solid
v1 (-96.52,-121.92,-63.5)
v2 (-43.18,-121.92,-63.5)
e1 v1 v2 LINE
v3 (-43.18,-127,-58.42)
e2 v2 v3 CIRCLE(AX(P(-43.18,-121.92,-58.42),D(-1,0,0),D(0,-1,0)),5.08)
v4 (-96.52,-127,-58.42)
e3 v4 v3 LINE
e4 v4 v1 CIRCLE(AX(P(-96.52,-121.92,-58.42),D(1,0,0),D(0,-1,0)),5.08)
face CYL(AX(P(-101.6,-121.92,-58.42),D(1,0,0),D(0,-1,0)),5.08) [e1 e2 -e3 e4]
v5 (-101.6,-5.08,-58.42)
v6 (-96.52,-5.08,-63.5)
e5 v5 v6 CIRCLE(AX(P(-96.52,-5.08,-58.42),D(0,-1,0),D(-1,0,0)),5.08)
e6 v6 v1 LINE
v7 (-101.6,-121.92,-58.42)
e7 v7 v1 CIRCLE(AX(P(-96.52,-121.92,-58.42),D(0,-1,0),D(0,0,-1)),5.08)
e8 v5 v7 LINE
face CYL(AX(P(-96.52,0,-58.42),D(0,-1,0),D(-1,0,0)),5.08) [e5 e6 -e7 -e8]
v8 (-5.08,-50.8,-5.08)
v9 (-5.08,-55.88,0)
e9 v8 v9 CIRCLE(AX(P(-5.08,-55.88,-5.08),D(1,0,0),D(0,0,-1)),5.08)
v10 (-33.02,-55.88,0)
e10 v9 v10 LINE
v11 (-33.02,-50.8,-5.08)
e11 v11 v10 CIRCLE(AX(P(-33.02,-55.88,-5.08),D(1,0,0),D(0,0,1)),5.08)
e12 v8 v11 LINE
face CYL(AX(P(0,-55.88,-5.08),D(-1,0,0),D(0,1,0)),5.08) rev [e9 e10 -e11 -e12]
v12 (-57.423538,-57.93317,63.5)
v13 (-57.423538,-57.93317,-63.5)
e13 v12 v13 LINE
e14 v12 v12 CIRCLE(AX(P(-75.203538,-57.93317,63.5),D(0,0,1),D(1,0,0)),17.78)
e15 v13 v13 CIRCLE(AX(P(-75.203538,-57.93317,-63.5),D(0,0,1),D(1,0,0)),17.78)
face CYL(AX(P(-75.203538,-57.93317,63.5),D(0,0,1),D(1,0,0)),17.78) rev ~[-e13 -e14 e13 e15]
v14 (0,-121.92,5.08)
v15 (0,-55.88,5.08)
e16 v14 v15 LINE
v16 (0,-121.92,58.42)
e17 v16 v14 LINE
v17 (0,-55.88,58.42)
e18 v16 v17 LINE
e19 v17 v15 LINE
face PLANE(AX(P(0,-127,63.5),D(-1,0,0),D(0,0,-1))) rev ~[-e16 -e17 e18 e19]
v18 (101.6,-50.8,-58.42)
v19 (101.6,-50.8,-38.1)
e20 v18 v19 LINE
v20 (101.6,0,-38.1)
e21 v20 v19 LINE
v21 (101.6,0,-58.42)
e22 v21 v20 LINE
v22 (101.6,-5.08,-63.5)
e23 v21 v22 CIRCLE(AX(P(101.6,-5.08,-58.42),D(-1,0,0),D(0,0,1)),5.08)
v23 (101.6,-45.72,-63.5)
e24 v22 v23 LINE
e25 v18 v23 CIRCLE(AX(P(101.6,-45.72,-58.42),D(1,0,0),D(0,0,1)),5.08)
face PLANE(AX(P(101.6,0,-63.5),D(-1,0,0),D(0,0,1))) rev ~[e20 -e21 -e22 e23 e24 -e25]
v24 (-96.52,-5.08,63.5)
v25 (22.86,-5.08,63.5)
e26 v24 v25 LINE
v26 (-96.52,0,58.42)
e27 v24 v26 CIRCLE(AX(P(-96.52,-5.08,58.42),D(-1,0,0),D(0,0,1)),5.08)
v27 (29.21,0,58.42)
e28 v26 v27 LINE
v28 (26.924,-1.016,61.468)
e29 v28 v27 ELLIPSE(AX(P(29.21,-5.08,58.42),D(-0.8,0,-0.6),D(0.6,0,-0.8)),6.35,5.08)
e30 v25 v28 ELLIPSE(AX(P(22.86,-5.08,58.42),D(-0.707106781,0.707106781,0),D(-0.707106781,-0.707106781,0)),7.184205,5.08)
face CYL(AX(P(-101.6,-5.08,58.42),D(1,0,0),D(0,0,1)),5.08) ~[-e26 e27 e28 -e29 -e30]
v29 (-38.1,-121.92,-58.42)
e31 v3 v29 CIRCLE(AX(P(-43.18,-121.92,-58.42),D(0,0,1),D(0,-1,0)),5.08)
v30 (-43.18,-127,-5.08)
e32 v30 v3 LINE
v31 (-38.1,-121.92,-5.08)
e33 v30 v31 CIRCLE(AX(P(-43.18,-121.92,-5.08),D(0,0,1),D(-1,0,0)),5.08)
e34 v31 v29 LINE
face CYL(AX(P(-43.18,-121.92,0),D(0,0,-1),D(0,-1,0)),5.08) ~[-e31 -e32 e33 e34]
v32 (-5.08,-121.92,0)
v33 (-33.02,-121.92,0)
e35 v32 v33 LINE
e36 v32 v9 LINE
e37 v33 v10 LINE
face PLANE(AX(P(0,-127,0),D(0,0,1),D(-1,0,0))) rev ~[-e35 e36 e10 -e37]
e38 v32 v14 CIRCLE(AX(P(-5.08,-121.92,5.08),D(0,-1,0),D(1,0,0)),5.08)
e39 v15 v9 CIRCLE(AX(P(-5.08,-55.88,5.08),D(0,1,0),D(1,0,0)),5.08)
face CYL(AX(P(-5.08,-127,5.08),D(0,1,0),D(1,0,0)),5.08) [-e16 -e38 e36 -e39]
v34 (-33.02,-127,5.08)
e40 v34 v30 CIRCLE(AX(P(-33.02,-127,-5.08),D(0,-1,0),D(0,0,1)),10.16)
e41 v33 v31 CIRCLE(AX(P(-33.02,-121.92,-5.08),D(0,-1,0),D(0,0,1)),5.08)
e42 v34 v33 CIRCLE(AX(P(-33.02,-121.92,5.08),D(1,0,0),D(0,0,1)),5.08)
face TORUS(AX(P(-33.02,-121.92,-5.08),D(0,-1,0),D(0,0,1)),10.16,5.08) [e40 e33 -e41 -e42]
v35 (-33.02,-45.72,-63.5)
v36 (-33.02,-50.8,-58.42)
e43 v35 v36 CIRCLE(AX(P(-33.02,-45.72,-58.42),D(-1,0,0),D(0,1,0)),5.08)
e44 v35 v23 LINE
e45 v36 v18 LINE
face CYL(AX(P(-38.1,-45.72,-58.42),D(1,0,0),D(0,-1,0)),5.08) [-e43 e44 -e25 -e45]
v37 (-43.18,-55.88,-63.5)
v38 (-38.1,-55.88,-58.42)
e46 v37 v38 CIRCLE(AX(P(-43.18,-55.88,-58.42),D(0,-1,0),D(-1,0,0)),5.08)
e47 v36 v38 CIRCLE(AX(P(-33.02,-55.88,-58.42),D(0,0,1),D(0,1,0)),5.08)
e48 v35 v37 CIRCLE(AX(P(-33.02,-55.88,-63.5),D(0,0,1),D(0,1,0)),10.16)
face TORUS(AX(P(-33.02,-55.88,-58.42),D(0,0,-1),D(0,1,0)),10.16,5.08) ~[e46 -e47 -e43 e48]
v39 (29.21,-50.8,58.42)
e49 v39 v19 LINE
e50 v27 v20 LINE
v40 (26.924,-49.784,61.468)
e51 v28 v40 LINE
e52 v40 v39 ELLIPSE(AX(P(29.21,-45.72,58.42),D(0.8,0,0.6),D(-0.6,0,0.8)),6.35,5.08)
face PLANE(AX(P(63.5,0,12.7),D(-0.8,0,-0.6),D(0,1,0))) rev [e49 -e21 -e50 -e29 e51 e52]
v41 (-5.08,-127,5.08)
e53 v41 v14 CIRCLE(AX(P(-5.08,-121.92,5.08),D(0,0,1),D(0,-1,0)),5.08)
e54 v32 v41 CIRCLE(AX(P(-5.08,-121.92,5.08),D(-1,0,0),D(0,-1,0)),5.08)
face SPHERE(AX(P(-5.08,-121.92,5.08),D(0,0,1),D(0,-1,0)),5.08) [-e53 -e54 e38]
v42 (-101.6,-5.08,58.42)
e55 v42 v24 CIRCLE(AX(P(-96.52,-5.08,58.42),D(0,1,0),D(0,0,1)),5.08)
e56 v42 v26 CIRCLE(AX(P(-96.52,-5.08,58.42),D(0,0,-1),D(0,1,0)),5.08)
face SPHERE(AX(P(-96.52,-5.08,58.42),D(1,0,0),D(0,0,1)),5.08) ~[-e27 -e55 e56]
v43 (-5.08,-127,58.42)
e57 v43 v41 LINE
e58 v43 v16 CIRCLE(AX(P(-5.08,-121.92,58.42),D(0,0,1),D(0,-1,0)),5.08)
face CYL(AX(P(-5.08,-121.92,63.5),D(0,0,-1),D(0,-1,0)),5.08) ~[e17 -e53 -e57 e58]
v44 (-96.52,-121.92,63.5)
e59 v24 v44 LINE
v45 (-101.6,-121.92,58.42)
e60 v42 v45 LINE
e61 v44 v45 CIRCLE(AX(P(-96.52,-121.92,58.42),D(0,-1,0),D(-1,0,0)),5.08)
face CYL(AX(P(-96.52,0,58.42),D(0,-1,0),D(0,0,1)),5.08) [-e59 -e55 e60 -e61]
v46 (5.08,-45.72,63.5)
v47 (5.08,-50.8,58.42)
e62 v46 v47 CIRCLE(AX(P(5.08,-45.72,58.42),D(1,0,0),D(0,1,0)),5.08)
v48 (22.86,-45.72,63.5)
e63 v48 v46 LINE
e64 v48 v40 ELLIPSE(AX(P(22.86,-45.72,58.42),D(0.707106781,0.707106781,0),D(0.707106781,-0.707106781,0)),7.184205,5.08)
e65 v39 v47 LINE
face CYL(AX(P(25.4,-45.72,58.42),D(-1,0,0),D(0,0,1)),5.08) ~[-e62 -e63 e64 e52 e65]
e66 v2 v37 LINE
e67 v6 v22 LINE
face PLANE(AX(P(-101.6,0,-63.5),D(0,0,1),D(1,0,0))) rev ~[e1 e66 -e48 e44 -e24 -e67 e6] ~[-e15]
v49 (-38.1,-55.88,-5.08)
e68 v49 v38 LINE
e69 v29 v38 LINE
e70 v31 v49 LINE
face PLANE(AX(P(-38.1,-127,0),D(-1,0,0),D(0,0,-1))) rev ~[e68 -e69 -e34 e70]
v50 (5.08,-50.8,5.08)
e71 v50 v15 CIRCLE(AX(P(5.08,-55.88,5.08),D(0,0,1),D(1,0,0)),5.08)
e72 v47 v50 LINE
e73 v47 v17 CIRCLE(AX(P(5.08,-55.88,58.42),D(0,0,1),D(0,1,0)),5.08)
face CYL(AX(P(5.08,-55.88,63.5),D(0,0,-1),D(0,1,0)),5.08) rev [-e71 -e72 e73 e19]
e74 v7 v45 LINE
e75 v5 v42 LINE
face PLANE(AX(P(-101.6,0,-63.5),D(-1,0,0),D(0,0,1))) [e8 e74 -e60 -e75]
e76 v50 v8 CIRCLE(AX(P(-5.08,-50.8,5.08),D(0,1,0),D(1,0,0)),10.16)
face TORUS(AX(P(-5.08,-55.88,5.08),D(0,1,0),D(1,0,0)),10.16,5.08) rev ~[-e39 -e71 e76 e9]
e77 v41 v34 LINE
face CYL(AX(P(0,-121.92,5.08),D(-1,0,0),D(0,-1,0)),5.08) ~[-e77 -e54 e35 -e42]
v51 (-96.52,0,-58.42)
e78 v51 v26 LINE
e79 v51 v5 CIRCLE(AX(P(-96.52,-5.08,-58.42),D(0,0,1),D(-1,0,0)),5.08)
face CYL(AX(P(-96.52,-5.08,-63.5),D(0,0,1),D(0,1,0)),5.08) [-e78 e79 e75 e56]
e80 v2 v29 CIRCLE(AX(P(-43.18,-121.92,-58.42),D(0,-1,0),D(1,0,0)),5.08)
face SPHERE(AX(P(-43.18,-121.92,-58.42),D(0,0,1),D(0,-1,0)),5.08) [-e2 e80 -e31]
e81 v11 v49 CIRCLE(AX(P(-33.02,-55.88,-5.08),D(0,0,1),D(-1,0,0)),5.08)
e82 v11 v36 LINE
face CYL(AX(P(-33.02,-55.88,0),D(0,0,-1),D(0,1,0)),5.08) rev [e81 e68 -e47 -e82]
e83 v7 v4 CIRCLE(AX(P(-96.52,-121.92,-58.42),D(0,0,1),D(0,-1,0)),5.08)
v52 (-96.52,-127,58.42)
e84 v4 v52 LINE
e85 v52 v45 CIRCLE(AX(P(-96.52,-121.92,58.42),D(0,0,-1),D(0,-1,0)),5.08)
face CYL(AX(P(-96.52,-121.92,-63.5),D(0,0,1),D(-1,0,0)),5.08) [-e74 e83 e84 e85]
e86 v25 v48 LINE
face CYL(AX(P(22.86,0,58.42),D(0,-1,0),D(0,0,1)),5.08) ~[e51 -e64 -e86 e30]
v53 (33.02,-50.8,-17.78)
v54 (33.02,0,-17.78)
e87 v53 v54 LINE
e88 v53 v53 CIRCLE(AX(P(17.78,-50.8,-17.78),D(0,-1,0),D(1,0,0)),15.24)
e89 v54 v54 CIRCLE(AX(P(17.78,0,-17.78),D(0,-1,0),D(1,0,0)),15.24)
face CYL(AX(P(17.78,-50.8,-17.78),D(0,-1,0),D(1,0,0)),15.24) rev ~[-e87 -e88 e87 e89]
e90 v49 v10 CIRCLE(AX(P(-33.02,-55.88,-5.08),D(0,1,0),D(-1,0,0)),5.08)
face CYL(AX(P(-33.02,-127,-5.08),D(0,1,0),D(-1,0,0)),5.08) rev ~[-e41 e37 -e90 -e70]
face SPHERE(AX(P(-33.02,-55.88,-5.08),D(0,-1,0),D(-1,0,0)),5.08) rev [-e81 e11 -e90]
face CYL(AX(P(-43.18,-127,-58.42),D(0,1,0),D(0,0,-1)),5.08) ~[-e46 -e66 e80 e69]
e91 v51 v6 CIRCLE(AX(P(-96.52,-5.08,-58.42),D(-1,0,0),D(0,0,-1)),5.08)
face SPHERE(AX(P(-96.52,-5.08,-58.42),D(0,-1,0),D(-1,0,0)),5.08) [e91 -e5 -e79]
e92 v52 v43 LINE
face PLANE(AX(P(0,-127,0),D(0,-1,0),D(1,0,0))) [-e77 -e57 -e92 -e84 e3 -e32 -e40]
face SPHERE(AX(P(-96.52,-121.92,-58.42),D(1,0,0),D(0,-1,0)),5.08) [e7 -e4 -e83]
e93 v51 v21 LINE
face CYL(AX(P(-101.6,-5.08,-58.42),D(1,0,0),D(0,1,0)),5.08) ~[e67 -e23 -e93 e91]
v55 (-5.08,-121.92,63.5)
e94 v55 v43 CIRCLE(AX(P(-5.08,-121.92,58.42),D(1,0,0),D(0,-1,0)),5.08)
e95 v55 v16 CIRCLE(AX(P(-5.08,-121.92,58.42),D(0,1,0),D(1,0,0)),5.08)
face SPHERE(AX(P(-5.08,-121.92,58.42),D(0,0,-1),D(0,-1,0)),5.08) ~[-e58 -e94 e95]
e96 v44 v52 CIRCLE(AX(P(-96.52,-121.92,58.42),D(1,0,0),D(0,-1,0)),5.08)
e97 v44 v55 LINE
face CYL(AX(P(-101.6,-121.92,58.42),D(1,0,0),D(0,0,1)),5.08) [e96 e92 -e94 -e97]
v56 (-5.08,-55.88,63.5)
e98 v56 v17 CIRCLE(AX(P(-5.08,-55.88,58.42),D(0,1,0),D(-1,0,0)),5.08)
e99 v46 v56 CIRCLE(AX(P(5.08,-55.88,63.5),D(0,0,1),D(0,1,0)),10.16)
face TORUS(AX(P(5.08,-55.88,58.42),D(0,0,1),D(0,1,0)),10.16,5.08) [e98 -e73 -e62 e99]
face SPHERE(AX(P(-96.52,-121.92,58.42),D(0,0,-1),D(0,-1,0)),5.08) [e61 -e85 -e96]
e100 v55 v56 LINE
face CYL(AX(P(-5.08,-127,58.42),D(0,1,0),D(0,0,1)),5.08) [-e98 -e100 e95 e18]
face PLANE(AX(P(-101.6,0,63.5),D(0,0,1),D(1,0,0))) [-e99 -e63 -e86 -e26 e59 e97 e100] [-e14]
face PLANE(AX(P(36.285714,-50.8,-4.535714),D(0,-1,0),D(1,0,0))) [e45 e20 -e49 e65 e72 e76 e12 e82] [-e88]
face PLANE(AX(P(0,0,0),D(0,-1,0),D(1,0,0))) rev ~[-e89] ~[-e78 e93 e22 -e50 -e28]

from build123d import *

# Parameters (mm, degrees)
F0_W     = 203.2
F0_H     = 127
F1_DEPTH = 127
F3_DEPTH = 76.2
F4_SIZE2 = 101.6
F4_SIZE  = 76.2
F5_R     = 5.08
F6_R     = 15.24
F7_DEPTH = 50.801
F8_R     = 17.78
F9_DEPTH = 127.001


with BuildPart() as f1:
    # F0 (on Front) → F1 (new body)
    with BuildSketch(Plane.XZ):
        Rectangle(F0_W, F0_H)
    extrude(amount=F1_DEPTH)

    # F2 (on face) → F3 (cut)
    with BuildSketch(Plane.XZ.offset(127)):
        Polygon((-38.1, 0), (-38.1, -63.5), (101.6, -63.5), (101.6, 63.5), (0, 63.5), (0, 0), align=None)
    extrude(amount=-F3_DEPTH, mode=Mode.SUBTRACT)

    # F4
    f4_edges = [f1.edges().sort_by_distance(p)[0] for p in [
        (101.6, -25.4, 63.5),
    ]]
    f4_side = f1.faces().sort_by_distance((-21.771429, -52.614286, 63.5))[0]
    chamfer(f4_edges, length=F4_SIZE, length2=F4_SIZE2, reference=f4_side)

    # F5
    f5_edges = [f1.edges().sort_by_distance(p)[0] for p in [
        (0, -127, 31.75),
        (-19.05, -127, 0),
        (-38.1, -127, -31.75),
        (-69.85, -127, -63.5),
        (-101.6, -127, 0),
        (-50.8, -127, 63.5),
        (0, -88.9, 63.5),
        (0, -88.9, 0),
        (0, -50.8, 31.75),
        (-38.1, -88.9, 0),
        (-38.1, -88.9, -63.5),
        (-38.1, -50.8, -31.75),
        (-38.1, 0, 63.5),
        (25.4, -25.4, 63.5),
        (-101.6, -63.5, 63.5),
        (12.7, -50.8, 63.5),
        (-101.6, -63.5, -63.5),
        (-101.6, 0, 0),
        (0, 0, -63.5),
        (31.75, -50.8, -63.5),
        (-19.05, -50.8, 0),
    ]]
    fillet(f5_edges, radius=F5_R)

    # F6 (on face) → F7 (cut, through all)
    with BuildSketch(Plane.XZ.offset(50.8)):
        with Locations((17.78, -17.78)):
            Circle(F6_R)
    extrude(amount=-F7_DEPTH, mode=Mode.SUBTRACT)

    # F8 (on face) → F9 (cut, through all)
    with BuildSketch(Plane.XY.offset(63.5)):
        with Locations((-75.203537941, -57.9331703484)):
            Circle(F8_R)
    extrude(amount=-F9_DEPTH, mode=Mode.SUBTRACT)


solid = f1.part
